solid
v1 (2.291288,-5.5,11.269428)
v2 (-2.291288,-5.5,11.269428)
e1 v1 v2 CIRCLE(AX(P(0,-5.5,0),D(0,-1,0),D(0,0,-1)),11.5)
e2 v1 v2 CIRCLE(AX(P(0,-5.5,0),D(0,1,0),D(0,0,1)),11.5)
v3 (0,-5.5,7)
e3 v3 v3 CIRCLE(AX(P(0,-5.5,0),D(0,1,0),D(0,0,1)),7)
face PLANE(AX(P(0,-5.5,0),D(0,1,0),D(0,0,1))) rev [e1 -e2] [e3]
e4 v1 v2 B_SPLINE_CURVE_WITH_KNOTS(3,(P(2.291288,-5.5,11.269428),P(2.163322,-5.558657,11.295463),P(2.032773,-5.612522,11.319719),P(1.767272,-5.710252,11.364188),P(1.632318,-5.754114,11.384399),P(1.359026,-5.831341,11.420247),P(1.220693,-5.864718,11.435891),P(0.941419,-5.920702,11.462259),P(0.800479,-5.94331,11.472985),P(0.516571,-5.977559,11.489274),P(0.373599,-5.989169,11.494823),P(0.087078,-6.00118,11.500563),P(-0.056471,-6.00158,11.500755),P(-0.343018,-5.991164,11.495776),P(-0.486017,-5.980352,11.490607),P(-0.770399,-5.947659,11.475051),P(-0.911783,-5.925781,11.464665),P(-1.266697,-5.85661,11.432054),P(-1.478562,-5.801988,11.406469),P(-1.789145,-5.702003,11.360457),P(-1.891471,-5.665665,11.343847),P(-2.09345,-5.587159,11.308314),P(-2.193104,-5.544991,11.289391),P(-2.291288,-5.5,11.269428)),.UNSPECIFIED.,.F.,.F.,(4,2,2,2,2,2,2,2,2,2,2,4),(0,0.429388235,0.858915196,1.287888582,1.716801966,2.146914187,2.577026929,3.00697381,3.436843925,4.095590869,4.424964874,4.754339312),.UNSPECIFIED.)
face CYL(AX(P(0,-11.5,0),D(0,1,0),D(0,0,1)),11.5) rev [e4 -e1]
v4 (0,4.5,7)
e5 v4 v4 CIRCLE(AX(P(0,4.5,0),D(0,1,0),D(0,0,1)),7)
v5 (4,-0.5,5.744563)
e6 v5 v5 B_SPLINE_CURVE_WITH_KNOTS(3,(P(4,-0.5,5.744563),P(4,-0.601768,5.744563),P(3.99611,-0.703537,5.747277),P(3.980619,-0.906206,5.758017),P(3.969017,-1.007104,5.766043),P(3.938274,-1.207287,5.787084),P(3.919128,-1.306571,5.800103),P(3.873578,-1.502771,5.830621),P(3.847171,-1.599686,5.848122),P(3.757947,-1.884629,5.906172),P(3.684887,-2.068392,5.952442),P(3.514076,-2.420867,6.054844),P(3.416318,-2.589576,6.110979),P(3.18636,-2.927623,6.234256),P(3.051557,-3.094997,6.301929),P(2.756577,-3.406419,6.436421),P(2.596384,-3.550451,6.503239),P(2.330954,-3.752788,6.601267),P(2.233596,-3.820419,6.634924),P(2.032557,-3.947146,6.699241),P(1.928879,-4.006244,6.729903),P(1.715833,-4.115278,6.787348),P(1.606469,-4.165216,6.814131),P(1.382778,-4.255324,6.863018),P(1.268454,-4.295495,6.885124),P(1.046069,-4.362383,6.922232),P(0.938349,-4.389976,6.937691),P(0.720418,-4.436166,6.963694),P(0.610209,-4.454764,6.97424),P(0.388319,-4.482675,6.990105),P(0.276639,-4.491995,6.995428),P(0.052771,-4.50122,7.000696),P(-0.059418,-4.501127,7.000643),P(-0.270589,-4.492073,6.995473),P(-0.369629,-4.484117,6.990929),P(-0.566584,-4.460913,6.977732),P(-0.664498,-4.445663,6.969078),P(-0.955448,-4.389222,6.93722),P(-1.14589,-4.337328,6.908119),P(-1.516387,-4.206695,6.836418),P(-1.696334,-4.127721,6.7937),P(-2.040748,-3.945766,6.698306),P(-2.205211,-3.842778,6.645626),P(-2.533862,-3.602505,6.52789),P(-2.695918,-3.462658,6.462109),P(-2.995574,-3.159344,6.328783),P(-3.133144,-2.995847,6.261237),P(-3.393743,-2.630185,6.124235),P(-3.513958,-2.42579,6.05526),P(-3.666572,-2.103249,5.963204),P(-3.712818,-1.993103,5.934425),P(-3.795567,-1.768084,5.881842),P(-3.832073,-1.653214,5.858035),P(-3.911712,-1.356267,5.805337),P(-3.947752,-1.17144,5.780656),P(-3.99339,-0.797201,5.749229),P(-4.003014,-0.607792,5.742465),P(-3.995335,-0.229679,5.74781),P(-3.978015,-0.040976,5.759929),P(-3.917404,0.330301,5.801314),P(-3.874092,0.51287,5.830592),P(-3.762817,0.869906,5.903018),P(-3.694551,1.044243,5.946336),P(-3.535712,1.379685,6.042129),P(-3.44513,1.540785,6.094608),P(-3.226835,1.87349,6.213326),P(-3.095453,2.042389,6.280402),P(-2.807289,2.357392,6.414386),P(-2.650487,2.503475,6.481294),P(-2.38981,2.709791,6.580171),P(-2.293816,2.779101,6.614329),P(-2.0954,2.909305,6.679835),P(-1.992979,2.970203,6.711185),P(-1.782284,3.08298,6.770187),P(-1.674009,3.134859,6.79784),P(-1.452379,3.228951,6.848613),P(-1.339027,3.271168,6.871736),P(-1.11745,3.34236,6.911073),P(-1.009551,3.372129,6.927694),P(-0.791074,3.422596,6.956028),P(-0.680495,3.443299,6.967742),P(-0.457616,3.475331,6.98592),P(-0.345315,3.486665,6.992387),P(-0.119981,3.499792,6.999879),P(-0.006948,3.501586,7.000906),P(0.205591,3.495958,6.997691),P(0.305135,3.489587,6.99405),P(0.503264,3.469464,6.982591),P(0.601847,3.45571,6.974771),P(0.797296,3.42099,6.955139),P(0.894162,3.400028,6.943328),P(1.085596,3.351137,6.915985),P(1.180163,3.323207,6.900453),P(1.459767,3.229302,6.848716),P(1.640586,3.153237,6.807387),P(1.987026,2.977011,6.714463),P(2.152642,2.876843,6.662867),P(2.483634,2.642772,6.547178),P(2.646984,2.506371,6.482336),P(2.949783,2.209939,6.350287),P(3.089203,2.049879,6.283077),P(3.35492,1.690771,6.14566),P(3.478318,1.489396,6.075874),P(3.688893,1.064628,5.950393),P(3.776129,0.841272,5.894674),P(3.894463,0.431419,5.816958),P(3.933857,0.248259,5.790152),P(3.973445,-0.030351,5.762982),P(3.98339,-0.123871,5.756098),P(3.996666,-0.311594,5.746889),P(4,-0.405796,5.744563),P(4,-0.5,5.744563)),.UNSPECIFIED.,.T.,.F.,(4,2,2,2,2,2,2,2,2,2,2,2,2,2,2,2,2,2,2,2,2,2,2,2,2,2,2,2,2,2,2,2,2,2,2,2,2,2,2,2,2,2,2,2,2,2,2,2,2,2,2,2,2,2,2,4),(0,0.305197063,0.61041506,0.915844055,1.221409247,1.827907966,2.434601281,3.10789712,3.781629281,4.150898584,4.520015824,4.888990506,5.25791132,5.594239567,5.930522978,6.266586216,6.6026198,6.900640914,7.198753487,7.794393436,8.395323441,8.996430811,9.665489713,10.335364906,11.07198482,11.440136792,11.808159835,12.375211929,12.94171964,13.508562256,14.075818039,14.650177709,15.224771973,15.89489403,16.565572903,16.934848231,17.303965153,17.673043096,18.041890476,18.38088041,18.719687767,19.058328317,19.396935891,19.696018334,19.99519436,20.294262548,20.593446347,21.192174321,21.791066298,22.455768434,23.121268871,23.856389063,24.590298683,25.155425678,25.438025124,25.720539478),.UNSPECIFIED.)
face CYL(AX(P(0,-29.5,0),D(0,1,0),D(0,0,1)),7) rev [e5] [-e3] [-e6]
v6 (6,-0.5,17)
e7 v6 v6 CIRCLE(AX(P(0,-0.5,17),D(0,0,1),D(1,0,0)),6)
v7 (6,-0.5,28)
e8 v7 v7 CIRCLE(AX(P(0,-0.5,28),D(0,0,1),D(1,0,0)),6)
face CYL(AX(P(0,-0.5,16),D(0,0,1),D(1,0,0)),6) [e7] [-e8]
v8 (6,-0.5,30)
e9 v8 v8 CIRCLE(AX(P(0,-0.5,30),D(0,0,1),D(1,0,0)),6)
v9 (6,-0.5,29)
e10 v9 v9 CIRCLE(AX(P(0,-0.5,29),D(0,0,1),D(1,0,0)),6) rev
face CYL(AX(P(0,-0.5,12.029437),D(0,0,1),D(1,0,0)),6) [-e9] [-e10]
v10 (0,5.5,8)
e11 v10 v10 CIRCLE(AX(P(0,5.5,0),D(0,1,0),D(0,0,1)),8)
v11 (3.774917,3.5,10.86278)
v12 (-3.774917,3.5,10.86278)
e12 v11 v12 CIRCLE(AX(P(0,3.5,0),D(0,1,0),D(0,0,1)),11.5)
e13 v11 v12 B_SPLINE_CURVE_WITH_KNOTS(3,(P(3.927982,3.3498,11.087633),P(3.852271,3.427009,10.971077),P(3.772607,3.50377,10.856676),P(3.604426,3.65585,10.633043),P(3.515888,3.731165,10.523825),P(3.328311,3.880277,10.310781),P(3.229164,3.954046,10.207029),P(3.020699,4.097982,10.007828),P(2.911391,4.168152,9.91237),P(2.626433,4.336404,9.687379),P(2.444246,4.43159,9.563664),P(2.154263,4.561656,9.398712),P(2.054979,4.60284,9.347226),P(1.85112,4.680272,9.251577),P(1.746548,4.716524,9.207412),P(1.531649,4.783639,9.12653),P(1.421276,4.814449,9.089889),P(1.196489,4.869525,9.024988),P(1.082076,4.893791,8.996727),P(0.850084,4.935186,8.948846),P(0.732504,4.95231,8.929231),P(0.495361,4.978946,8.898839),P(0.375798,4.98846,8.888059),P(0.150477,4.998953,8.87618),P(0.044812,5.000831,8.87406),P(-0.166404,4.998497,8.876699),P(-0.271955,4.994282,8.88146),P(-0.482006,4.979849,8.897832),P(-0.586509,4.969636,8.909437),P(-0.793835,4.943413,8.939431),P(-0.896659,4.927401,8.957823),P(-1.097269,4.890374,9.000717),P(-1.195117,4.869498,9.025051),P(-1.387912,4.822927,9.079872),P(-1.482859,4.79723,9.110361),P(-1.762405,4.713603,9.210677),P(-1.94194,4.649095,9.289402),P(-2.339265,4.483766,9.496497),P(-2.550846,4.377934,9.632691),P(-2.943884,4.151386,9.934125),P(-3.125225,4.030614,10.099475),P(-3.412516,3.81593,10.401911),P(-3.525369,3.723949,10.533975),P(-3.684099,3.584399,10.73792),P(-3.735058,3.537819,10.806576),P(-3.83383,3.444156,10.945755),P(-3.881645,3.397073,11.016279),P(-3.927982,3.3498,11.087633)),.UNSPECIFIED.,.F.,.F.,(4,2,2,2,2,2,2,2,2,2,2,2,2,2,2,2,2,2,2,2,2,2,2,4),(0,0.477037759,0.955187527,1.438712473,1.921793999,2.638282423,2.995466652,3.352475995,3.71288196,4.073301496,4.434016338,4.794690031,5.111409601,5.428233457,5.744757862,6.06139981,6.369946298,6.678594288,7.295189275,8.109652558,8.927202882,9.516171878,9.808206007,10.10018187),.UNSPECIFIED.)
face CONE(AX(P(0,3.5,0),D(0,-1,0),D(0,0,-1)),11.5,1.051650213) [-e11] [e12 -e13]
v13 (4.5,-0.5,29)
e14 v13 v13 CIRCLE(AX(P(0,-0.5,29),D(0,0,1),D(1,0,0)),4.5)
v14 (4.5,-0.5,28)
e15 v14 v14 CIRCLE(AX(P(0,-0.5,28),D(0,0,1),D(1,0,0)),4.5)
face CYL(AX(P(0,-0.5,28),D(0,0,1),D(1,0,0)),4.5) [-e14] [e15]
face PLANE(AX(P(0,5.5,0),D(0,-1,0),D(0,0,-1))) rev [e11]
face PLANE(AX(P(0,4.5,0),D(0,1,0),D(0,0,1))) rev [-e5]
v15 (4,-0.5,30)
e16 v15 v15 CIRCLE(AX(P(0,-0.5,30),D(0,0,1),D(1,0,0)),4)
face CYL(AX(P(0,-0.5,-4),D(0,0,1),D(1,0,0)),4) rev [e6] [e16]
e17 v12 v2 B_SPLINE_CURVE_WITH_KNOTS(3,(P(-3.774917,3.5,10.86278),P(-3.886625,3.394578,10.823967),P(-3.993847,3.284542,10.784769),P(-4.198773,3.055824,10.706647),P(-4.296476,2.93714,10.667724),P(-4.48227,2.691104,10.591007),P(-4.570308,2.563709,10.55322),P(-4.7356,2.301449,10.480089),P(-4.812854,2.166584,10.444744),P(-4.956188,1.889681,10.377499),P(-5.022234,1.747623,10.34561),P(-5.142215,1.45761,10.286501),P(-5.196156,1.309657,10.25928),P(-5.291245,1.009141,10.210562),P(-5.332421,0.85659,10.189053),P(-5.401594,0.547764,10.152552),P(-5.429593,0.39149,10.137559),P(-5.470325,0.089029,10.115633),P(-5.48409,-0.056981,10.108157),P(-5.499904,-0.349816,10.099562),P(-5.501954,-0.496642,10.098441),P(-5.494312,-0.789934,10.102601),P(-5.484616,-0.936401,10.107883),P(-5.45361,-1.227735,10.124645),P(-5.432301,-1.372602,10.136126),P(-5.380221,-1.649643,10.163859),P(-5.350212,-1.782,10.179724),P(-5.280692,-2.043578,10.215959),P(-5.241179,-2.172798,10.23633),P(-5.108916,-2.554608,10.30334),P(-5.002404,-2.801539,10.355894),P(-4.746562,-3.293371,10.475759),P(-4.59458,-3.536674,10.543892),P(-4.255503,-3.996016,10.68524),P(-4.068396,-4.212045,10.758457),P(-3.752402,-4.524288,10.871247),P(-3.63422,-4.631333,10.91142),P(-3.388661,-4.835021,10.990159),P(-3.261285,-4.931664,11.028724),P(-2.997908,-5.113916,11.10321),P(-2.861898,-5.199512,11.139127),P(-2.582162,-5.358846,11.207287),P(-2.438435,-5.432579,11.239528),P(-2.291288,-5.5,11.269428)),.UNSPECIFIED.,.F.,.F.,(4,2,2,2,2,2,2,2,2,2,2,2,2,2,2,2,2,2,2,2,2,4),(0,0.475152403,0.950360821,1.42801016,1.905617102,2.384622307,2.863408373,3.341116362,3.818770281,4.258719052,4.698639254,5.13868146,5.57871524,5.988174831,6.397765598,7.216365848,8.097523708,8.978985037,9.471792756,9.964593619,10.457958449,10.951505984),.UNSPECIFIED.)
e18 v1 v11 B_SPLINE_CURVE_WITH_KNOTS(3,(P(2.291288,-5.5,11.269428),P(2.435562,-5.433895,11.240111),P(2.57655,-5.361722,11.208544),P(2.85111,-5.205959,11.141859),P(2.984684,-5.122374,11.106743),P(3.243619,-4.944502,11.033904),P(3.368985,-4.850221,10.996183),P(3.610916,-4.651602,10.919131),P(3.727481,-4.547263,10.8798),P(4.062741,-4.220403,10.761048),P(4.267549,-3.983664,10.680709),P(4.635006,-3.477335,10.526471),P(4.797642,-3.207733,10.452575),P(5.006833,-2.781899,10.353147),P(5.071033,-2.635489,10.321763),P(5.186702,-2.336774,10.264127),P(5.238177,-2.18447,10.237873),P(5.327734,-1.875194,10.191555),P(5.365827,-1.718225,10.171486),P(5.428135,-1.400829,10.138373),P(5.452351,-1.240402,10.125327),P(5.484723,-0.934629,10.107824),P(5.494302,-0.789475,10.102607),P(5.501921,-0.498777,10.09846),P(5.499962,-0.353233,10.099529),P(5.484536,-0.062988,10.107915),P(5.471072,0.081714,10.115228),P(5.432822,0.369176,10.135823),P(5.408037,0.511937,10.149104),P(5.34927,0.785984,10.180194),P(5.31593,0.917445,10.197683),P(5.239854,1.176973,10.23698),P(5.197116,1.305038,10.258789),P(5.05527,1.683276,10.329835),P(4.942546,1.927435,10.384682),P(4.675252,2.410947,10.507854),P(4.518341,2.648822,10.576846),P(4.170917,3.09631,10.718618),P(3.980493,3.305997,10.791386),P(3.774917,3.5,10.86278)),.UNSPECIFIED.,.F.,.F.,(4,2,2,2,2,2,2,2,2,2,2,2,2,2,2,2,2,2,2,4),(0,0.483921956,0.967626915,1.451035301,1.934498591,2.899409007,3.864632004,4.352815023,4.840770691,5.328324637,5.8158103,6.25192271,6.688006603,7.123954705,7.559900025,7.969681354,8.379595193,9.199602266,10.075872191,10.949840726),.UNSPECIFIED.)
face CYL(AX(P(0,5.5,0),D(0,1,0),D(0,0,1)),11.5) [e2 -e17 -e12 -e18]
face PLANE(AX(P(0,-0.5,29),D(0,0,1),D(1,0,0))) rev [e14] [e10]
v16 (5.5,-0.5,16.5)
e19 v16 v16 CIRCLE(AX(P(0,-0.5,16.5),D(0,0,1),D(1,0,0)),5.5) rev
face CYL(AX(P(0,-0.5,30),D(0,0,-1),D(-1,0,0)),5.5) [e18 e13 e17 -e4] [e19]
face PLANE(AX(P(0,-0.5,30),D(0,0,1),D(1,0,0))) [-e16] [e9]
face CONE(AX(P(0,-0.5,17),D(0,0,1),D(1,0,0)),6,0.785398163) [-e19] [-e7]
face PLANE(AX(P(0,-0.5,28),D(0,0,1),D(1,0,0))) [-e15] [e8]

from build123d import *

# Parameters (mm, degrees)
SKETCH2_R           = 5.5
BOSS_EXTRUDE4_DEPTH = 30
CUT_EXTRUDE1_START  = -2
SKETCH3_R           = 5.5
SKETCH3_R_2         = 4.5
CUT_EXTRUDE1_DEPTH  = 1
SKETCH5_R           = 11.5
CUT_EXTRUDE3_DEPTH  = 6
SKETCH8_R           = 4
CUT_EXTRUDE4_DEPTH  = 34
CUT_EXTRUDE6_START  = -1
SKETCH9_R           = 7
CUT_EXTRUDE6_DEPTH  = 34
BOSS_EXTRUDE5_START = -1
SKETCH10_R          = 6
SKETCH10_R_2        = 5.5
BOSS_EXTRUDE5_DEPTH = 1
BOSS_EXTRUDE6_START = -12
SKETCH11_R          = 6
SKETCH11_R_2        = 5.5
BOSS_EXTRUDE6_DEPTH = 12
CHAMFER1_SIZE       = 1


with BuildPart() as part:
    # Sketch1 → Revolve2 (revolve)
    with BuildSketch(Plane.XY, mode=Mode.PRIVATE) as revolve2_sk:
        Polygon((11.5, 3.5), (8, 5.5), (0, 5.5), (0, -5.5), (11.5, -5.5), align=None)
    revolve(revolve2_sk.sketch.rotate(Axis((0, 5.5, 0), (0, -1, 0)), 90), axis=Axis((0, 5.5, 0), (0, -1, 0)))

    # Sketch2 → Boss-Extrude4 (add)
    with BuildSketch(Plane.XY):
        with Locations(Location((0, -0.5, 0), (0, 0, 133.341758512))):
            Circle(SKETCH2_R)
    extrude(amount=BOSS_EXTRUDE4_DEPTH)

    # Sketch3 → Cut-Extrude1 (cut)
    with BuildSketch(Plane.XY.offset(30).offset(CUT_EXTRUDE1_START)):
        with Locations(Location((0, -0.5, 0), (0, 0, 133.341758512))):
            Circle(SKETCH3_R)
        with Locations((0, -0.5)):
            Circle(SKETCH3_R_2, mode=Mode.SUBTRACT)
    extrude(amount=CUT_EXTRUDE1_DEPTH, mode=Mode.SUBTRACT)

    # Sketch5 → Cut-Extrude3 (cut)
    with BuildSketch(Plane.XZ.offset(5.5)):
        Circle(SKETCH5_R)
    extrude(amount=CUT_EXTRUDE3_DEPTH, mode=Mode.SUBTRACT)

    # Sketch8 → Cut-Extrude4 (cut)
    with BuildSketch(Plane.XY.offset(30)):
        with Locations((0, -0.5)):
            Circle(SKETCH8_R)
    extrude(amount=-CUT_EXTRUDE4_DEPTH, mode=Mode.SUBTRACT)

    # Sketch9 → Cut-Extrude6 (cut)
    with BuildSketch(Plane(origin=(0, 5.5, 0), x_dir=(1, 0, 0), z_dir=(0, 1, 0)).offset(CUT_EXTRUDE6_START)):
        with Locations(Location((0, 0, 0), (0, 0, 270))):
            Circle(SKETCH9_R)
    extrude(amount=-CUT_EXTRUDE6_DEPTH, mode=Mode.SUBTRACT)

    # Sketch10 → Boss-Extrude5 (add)
    with BuildSketch(Plane.XY.offset(30).offset(BOSS_EXTRUDE5_START)):
        with Locations((0, -0.5)):
            Circle(SKETCH10_R)
        with Locations(Location((0, -0.5, 0), (0, 0, 133.341758512))):
            Circle(SKETCH10_R_2, mode=Mode.SUBTRACT)
    extrude(amount=BOSS_EXTRUDE5_DEPTH)

    # Sketch11 → Boss-Extrude6 (add)
    with BuildSketch(Plane.XY.offset(28).offset(BOSS_EXTRUDE6_START)):
        with Locations((0, -0.5)):
            Circle(SKETCH11_R)
        with Locations(Location((0, -0.5, 0), (0, 0, 133.341758512))):
            Circle(SKETCH11_R_2, mode=Mode.SUBTRACT)
    extrude(amount=BOSS_EXTRUDE6_DEPTH)

    # Chamfer1
    # the kernel refuses this chamfer: 1 mm, written as the material it takes off along each edge
    with BuildSketch(Plane(origin=(0, -0.5, 16), x_dir=(1, 0, 0), z_dir=(0, -1, 0))) as chamfer1_piece_1_section:
        Polygon((6 - CHAMFER1_SIZE, 0), (6, CHAMFER1_SIZE), (6, 0), align=None)
    chamfer1_piece_1 = revolve(axis=Axis((0, -0.5, 16), (0, 0, 1)), mode=Mode.PRIVATE)
    chamfer1_piece_1 = chamfer1_piece_1 - Plane(origin=(0, -0.5, 16.746748463), x_dir=(-0.6863485886393825, 0.7272727238613639, 0), z_dir=(0, 0, -1)) * Cylinder(5.5, 25, mode=Mode.PRIVATE)
    add(chamfer1_piece_1, mode=Mode.SUBTRACT)


solid = part.part
